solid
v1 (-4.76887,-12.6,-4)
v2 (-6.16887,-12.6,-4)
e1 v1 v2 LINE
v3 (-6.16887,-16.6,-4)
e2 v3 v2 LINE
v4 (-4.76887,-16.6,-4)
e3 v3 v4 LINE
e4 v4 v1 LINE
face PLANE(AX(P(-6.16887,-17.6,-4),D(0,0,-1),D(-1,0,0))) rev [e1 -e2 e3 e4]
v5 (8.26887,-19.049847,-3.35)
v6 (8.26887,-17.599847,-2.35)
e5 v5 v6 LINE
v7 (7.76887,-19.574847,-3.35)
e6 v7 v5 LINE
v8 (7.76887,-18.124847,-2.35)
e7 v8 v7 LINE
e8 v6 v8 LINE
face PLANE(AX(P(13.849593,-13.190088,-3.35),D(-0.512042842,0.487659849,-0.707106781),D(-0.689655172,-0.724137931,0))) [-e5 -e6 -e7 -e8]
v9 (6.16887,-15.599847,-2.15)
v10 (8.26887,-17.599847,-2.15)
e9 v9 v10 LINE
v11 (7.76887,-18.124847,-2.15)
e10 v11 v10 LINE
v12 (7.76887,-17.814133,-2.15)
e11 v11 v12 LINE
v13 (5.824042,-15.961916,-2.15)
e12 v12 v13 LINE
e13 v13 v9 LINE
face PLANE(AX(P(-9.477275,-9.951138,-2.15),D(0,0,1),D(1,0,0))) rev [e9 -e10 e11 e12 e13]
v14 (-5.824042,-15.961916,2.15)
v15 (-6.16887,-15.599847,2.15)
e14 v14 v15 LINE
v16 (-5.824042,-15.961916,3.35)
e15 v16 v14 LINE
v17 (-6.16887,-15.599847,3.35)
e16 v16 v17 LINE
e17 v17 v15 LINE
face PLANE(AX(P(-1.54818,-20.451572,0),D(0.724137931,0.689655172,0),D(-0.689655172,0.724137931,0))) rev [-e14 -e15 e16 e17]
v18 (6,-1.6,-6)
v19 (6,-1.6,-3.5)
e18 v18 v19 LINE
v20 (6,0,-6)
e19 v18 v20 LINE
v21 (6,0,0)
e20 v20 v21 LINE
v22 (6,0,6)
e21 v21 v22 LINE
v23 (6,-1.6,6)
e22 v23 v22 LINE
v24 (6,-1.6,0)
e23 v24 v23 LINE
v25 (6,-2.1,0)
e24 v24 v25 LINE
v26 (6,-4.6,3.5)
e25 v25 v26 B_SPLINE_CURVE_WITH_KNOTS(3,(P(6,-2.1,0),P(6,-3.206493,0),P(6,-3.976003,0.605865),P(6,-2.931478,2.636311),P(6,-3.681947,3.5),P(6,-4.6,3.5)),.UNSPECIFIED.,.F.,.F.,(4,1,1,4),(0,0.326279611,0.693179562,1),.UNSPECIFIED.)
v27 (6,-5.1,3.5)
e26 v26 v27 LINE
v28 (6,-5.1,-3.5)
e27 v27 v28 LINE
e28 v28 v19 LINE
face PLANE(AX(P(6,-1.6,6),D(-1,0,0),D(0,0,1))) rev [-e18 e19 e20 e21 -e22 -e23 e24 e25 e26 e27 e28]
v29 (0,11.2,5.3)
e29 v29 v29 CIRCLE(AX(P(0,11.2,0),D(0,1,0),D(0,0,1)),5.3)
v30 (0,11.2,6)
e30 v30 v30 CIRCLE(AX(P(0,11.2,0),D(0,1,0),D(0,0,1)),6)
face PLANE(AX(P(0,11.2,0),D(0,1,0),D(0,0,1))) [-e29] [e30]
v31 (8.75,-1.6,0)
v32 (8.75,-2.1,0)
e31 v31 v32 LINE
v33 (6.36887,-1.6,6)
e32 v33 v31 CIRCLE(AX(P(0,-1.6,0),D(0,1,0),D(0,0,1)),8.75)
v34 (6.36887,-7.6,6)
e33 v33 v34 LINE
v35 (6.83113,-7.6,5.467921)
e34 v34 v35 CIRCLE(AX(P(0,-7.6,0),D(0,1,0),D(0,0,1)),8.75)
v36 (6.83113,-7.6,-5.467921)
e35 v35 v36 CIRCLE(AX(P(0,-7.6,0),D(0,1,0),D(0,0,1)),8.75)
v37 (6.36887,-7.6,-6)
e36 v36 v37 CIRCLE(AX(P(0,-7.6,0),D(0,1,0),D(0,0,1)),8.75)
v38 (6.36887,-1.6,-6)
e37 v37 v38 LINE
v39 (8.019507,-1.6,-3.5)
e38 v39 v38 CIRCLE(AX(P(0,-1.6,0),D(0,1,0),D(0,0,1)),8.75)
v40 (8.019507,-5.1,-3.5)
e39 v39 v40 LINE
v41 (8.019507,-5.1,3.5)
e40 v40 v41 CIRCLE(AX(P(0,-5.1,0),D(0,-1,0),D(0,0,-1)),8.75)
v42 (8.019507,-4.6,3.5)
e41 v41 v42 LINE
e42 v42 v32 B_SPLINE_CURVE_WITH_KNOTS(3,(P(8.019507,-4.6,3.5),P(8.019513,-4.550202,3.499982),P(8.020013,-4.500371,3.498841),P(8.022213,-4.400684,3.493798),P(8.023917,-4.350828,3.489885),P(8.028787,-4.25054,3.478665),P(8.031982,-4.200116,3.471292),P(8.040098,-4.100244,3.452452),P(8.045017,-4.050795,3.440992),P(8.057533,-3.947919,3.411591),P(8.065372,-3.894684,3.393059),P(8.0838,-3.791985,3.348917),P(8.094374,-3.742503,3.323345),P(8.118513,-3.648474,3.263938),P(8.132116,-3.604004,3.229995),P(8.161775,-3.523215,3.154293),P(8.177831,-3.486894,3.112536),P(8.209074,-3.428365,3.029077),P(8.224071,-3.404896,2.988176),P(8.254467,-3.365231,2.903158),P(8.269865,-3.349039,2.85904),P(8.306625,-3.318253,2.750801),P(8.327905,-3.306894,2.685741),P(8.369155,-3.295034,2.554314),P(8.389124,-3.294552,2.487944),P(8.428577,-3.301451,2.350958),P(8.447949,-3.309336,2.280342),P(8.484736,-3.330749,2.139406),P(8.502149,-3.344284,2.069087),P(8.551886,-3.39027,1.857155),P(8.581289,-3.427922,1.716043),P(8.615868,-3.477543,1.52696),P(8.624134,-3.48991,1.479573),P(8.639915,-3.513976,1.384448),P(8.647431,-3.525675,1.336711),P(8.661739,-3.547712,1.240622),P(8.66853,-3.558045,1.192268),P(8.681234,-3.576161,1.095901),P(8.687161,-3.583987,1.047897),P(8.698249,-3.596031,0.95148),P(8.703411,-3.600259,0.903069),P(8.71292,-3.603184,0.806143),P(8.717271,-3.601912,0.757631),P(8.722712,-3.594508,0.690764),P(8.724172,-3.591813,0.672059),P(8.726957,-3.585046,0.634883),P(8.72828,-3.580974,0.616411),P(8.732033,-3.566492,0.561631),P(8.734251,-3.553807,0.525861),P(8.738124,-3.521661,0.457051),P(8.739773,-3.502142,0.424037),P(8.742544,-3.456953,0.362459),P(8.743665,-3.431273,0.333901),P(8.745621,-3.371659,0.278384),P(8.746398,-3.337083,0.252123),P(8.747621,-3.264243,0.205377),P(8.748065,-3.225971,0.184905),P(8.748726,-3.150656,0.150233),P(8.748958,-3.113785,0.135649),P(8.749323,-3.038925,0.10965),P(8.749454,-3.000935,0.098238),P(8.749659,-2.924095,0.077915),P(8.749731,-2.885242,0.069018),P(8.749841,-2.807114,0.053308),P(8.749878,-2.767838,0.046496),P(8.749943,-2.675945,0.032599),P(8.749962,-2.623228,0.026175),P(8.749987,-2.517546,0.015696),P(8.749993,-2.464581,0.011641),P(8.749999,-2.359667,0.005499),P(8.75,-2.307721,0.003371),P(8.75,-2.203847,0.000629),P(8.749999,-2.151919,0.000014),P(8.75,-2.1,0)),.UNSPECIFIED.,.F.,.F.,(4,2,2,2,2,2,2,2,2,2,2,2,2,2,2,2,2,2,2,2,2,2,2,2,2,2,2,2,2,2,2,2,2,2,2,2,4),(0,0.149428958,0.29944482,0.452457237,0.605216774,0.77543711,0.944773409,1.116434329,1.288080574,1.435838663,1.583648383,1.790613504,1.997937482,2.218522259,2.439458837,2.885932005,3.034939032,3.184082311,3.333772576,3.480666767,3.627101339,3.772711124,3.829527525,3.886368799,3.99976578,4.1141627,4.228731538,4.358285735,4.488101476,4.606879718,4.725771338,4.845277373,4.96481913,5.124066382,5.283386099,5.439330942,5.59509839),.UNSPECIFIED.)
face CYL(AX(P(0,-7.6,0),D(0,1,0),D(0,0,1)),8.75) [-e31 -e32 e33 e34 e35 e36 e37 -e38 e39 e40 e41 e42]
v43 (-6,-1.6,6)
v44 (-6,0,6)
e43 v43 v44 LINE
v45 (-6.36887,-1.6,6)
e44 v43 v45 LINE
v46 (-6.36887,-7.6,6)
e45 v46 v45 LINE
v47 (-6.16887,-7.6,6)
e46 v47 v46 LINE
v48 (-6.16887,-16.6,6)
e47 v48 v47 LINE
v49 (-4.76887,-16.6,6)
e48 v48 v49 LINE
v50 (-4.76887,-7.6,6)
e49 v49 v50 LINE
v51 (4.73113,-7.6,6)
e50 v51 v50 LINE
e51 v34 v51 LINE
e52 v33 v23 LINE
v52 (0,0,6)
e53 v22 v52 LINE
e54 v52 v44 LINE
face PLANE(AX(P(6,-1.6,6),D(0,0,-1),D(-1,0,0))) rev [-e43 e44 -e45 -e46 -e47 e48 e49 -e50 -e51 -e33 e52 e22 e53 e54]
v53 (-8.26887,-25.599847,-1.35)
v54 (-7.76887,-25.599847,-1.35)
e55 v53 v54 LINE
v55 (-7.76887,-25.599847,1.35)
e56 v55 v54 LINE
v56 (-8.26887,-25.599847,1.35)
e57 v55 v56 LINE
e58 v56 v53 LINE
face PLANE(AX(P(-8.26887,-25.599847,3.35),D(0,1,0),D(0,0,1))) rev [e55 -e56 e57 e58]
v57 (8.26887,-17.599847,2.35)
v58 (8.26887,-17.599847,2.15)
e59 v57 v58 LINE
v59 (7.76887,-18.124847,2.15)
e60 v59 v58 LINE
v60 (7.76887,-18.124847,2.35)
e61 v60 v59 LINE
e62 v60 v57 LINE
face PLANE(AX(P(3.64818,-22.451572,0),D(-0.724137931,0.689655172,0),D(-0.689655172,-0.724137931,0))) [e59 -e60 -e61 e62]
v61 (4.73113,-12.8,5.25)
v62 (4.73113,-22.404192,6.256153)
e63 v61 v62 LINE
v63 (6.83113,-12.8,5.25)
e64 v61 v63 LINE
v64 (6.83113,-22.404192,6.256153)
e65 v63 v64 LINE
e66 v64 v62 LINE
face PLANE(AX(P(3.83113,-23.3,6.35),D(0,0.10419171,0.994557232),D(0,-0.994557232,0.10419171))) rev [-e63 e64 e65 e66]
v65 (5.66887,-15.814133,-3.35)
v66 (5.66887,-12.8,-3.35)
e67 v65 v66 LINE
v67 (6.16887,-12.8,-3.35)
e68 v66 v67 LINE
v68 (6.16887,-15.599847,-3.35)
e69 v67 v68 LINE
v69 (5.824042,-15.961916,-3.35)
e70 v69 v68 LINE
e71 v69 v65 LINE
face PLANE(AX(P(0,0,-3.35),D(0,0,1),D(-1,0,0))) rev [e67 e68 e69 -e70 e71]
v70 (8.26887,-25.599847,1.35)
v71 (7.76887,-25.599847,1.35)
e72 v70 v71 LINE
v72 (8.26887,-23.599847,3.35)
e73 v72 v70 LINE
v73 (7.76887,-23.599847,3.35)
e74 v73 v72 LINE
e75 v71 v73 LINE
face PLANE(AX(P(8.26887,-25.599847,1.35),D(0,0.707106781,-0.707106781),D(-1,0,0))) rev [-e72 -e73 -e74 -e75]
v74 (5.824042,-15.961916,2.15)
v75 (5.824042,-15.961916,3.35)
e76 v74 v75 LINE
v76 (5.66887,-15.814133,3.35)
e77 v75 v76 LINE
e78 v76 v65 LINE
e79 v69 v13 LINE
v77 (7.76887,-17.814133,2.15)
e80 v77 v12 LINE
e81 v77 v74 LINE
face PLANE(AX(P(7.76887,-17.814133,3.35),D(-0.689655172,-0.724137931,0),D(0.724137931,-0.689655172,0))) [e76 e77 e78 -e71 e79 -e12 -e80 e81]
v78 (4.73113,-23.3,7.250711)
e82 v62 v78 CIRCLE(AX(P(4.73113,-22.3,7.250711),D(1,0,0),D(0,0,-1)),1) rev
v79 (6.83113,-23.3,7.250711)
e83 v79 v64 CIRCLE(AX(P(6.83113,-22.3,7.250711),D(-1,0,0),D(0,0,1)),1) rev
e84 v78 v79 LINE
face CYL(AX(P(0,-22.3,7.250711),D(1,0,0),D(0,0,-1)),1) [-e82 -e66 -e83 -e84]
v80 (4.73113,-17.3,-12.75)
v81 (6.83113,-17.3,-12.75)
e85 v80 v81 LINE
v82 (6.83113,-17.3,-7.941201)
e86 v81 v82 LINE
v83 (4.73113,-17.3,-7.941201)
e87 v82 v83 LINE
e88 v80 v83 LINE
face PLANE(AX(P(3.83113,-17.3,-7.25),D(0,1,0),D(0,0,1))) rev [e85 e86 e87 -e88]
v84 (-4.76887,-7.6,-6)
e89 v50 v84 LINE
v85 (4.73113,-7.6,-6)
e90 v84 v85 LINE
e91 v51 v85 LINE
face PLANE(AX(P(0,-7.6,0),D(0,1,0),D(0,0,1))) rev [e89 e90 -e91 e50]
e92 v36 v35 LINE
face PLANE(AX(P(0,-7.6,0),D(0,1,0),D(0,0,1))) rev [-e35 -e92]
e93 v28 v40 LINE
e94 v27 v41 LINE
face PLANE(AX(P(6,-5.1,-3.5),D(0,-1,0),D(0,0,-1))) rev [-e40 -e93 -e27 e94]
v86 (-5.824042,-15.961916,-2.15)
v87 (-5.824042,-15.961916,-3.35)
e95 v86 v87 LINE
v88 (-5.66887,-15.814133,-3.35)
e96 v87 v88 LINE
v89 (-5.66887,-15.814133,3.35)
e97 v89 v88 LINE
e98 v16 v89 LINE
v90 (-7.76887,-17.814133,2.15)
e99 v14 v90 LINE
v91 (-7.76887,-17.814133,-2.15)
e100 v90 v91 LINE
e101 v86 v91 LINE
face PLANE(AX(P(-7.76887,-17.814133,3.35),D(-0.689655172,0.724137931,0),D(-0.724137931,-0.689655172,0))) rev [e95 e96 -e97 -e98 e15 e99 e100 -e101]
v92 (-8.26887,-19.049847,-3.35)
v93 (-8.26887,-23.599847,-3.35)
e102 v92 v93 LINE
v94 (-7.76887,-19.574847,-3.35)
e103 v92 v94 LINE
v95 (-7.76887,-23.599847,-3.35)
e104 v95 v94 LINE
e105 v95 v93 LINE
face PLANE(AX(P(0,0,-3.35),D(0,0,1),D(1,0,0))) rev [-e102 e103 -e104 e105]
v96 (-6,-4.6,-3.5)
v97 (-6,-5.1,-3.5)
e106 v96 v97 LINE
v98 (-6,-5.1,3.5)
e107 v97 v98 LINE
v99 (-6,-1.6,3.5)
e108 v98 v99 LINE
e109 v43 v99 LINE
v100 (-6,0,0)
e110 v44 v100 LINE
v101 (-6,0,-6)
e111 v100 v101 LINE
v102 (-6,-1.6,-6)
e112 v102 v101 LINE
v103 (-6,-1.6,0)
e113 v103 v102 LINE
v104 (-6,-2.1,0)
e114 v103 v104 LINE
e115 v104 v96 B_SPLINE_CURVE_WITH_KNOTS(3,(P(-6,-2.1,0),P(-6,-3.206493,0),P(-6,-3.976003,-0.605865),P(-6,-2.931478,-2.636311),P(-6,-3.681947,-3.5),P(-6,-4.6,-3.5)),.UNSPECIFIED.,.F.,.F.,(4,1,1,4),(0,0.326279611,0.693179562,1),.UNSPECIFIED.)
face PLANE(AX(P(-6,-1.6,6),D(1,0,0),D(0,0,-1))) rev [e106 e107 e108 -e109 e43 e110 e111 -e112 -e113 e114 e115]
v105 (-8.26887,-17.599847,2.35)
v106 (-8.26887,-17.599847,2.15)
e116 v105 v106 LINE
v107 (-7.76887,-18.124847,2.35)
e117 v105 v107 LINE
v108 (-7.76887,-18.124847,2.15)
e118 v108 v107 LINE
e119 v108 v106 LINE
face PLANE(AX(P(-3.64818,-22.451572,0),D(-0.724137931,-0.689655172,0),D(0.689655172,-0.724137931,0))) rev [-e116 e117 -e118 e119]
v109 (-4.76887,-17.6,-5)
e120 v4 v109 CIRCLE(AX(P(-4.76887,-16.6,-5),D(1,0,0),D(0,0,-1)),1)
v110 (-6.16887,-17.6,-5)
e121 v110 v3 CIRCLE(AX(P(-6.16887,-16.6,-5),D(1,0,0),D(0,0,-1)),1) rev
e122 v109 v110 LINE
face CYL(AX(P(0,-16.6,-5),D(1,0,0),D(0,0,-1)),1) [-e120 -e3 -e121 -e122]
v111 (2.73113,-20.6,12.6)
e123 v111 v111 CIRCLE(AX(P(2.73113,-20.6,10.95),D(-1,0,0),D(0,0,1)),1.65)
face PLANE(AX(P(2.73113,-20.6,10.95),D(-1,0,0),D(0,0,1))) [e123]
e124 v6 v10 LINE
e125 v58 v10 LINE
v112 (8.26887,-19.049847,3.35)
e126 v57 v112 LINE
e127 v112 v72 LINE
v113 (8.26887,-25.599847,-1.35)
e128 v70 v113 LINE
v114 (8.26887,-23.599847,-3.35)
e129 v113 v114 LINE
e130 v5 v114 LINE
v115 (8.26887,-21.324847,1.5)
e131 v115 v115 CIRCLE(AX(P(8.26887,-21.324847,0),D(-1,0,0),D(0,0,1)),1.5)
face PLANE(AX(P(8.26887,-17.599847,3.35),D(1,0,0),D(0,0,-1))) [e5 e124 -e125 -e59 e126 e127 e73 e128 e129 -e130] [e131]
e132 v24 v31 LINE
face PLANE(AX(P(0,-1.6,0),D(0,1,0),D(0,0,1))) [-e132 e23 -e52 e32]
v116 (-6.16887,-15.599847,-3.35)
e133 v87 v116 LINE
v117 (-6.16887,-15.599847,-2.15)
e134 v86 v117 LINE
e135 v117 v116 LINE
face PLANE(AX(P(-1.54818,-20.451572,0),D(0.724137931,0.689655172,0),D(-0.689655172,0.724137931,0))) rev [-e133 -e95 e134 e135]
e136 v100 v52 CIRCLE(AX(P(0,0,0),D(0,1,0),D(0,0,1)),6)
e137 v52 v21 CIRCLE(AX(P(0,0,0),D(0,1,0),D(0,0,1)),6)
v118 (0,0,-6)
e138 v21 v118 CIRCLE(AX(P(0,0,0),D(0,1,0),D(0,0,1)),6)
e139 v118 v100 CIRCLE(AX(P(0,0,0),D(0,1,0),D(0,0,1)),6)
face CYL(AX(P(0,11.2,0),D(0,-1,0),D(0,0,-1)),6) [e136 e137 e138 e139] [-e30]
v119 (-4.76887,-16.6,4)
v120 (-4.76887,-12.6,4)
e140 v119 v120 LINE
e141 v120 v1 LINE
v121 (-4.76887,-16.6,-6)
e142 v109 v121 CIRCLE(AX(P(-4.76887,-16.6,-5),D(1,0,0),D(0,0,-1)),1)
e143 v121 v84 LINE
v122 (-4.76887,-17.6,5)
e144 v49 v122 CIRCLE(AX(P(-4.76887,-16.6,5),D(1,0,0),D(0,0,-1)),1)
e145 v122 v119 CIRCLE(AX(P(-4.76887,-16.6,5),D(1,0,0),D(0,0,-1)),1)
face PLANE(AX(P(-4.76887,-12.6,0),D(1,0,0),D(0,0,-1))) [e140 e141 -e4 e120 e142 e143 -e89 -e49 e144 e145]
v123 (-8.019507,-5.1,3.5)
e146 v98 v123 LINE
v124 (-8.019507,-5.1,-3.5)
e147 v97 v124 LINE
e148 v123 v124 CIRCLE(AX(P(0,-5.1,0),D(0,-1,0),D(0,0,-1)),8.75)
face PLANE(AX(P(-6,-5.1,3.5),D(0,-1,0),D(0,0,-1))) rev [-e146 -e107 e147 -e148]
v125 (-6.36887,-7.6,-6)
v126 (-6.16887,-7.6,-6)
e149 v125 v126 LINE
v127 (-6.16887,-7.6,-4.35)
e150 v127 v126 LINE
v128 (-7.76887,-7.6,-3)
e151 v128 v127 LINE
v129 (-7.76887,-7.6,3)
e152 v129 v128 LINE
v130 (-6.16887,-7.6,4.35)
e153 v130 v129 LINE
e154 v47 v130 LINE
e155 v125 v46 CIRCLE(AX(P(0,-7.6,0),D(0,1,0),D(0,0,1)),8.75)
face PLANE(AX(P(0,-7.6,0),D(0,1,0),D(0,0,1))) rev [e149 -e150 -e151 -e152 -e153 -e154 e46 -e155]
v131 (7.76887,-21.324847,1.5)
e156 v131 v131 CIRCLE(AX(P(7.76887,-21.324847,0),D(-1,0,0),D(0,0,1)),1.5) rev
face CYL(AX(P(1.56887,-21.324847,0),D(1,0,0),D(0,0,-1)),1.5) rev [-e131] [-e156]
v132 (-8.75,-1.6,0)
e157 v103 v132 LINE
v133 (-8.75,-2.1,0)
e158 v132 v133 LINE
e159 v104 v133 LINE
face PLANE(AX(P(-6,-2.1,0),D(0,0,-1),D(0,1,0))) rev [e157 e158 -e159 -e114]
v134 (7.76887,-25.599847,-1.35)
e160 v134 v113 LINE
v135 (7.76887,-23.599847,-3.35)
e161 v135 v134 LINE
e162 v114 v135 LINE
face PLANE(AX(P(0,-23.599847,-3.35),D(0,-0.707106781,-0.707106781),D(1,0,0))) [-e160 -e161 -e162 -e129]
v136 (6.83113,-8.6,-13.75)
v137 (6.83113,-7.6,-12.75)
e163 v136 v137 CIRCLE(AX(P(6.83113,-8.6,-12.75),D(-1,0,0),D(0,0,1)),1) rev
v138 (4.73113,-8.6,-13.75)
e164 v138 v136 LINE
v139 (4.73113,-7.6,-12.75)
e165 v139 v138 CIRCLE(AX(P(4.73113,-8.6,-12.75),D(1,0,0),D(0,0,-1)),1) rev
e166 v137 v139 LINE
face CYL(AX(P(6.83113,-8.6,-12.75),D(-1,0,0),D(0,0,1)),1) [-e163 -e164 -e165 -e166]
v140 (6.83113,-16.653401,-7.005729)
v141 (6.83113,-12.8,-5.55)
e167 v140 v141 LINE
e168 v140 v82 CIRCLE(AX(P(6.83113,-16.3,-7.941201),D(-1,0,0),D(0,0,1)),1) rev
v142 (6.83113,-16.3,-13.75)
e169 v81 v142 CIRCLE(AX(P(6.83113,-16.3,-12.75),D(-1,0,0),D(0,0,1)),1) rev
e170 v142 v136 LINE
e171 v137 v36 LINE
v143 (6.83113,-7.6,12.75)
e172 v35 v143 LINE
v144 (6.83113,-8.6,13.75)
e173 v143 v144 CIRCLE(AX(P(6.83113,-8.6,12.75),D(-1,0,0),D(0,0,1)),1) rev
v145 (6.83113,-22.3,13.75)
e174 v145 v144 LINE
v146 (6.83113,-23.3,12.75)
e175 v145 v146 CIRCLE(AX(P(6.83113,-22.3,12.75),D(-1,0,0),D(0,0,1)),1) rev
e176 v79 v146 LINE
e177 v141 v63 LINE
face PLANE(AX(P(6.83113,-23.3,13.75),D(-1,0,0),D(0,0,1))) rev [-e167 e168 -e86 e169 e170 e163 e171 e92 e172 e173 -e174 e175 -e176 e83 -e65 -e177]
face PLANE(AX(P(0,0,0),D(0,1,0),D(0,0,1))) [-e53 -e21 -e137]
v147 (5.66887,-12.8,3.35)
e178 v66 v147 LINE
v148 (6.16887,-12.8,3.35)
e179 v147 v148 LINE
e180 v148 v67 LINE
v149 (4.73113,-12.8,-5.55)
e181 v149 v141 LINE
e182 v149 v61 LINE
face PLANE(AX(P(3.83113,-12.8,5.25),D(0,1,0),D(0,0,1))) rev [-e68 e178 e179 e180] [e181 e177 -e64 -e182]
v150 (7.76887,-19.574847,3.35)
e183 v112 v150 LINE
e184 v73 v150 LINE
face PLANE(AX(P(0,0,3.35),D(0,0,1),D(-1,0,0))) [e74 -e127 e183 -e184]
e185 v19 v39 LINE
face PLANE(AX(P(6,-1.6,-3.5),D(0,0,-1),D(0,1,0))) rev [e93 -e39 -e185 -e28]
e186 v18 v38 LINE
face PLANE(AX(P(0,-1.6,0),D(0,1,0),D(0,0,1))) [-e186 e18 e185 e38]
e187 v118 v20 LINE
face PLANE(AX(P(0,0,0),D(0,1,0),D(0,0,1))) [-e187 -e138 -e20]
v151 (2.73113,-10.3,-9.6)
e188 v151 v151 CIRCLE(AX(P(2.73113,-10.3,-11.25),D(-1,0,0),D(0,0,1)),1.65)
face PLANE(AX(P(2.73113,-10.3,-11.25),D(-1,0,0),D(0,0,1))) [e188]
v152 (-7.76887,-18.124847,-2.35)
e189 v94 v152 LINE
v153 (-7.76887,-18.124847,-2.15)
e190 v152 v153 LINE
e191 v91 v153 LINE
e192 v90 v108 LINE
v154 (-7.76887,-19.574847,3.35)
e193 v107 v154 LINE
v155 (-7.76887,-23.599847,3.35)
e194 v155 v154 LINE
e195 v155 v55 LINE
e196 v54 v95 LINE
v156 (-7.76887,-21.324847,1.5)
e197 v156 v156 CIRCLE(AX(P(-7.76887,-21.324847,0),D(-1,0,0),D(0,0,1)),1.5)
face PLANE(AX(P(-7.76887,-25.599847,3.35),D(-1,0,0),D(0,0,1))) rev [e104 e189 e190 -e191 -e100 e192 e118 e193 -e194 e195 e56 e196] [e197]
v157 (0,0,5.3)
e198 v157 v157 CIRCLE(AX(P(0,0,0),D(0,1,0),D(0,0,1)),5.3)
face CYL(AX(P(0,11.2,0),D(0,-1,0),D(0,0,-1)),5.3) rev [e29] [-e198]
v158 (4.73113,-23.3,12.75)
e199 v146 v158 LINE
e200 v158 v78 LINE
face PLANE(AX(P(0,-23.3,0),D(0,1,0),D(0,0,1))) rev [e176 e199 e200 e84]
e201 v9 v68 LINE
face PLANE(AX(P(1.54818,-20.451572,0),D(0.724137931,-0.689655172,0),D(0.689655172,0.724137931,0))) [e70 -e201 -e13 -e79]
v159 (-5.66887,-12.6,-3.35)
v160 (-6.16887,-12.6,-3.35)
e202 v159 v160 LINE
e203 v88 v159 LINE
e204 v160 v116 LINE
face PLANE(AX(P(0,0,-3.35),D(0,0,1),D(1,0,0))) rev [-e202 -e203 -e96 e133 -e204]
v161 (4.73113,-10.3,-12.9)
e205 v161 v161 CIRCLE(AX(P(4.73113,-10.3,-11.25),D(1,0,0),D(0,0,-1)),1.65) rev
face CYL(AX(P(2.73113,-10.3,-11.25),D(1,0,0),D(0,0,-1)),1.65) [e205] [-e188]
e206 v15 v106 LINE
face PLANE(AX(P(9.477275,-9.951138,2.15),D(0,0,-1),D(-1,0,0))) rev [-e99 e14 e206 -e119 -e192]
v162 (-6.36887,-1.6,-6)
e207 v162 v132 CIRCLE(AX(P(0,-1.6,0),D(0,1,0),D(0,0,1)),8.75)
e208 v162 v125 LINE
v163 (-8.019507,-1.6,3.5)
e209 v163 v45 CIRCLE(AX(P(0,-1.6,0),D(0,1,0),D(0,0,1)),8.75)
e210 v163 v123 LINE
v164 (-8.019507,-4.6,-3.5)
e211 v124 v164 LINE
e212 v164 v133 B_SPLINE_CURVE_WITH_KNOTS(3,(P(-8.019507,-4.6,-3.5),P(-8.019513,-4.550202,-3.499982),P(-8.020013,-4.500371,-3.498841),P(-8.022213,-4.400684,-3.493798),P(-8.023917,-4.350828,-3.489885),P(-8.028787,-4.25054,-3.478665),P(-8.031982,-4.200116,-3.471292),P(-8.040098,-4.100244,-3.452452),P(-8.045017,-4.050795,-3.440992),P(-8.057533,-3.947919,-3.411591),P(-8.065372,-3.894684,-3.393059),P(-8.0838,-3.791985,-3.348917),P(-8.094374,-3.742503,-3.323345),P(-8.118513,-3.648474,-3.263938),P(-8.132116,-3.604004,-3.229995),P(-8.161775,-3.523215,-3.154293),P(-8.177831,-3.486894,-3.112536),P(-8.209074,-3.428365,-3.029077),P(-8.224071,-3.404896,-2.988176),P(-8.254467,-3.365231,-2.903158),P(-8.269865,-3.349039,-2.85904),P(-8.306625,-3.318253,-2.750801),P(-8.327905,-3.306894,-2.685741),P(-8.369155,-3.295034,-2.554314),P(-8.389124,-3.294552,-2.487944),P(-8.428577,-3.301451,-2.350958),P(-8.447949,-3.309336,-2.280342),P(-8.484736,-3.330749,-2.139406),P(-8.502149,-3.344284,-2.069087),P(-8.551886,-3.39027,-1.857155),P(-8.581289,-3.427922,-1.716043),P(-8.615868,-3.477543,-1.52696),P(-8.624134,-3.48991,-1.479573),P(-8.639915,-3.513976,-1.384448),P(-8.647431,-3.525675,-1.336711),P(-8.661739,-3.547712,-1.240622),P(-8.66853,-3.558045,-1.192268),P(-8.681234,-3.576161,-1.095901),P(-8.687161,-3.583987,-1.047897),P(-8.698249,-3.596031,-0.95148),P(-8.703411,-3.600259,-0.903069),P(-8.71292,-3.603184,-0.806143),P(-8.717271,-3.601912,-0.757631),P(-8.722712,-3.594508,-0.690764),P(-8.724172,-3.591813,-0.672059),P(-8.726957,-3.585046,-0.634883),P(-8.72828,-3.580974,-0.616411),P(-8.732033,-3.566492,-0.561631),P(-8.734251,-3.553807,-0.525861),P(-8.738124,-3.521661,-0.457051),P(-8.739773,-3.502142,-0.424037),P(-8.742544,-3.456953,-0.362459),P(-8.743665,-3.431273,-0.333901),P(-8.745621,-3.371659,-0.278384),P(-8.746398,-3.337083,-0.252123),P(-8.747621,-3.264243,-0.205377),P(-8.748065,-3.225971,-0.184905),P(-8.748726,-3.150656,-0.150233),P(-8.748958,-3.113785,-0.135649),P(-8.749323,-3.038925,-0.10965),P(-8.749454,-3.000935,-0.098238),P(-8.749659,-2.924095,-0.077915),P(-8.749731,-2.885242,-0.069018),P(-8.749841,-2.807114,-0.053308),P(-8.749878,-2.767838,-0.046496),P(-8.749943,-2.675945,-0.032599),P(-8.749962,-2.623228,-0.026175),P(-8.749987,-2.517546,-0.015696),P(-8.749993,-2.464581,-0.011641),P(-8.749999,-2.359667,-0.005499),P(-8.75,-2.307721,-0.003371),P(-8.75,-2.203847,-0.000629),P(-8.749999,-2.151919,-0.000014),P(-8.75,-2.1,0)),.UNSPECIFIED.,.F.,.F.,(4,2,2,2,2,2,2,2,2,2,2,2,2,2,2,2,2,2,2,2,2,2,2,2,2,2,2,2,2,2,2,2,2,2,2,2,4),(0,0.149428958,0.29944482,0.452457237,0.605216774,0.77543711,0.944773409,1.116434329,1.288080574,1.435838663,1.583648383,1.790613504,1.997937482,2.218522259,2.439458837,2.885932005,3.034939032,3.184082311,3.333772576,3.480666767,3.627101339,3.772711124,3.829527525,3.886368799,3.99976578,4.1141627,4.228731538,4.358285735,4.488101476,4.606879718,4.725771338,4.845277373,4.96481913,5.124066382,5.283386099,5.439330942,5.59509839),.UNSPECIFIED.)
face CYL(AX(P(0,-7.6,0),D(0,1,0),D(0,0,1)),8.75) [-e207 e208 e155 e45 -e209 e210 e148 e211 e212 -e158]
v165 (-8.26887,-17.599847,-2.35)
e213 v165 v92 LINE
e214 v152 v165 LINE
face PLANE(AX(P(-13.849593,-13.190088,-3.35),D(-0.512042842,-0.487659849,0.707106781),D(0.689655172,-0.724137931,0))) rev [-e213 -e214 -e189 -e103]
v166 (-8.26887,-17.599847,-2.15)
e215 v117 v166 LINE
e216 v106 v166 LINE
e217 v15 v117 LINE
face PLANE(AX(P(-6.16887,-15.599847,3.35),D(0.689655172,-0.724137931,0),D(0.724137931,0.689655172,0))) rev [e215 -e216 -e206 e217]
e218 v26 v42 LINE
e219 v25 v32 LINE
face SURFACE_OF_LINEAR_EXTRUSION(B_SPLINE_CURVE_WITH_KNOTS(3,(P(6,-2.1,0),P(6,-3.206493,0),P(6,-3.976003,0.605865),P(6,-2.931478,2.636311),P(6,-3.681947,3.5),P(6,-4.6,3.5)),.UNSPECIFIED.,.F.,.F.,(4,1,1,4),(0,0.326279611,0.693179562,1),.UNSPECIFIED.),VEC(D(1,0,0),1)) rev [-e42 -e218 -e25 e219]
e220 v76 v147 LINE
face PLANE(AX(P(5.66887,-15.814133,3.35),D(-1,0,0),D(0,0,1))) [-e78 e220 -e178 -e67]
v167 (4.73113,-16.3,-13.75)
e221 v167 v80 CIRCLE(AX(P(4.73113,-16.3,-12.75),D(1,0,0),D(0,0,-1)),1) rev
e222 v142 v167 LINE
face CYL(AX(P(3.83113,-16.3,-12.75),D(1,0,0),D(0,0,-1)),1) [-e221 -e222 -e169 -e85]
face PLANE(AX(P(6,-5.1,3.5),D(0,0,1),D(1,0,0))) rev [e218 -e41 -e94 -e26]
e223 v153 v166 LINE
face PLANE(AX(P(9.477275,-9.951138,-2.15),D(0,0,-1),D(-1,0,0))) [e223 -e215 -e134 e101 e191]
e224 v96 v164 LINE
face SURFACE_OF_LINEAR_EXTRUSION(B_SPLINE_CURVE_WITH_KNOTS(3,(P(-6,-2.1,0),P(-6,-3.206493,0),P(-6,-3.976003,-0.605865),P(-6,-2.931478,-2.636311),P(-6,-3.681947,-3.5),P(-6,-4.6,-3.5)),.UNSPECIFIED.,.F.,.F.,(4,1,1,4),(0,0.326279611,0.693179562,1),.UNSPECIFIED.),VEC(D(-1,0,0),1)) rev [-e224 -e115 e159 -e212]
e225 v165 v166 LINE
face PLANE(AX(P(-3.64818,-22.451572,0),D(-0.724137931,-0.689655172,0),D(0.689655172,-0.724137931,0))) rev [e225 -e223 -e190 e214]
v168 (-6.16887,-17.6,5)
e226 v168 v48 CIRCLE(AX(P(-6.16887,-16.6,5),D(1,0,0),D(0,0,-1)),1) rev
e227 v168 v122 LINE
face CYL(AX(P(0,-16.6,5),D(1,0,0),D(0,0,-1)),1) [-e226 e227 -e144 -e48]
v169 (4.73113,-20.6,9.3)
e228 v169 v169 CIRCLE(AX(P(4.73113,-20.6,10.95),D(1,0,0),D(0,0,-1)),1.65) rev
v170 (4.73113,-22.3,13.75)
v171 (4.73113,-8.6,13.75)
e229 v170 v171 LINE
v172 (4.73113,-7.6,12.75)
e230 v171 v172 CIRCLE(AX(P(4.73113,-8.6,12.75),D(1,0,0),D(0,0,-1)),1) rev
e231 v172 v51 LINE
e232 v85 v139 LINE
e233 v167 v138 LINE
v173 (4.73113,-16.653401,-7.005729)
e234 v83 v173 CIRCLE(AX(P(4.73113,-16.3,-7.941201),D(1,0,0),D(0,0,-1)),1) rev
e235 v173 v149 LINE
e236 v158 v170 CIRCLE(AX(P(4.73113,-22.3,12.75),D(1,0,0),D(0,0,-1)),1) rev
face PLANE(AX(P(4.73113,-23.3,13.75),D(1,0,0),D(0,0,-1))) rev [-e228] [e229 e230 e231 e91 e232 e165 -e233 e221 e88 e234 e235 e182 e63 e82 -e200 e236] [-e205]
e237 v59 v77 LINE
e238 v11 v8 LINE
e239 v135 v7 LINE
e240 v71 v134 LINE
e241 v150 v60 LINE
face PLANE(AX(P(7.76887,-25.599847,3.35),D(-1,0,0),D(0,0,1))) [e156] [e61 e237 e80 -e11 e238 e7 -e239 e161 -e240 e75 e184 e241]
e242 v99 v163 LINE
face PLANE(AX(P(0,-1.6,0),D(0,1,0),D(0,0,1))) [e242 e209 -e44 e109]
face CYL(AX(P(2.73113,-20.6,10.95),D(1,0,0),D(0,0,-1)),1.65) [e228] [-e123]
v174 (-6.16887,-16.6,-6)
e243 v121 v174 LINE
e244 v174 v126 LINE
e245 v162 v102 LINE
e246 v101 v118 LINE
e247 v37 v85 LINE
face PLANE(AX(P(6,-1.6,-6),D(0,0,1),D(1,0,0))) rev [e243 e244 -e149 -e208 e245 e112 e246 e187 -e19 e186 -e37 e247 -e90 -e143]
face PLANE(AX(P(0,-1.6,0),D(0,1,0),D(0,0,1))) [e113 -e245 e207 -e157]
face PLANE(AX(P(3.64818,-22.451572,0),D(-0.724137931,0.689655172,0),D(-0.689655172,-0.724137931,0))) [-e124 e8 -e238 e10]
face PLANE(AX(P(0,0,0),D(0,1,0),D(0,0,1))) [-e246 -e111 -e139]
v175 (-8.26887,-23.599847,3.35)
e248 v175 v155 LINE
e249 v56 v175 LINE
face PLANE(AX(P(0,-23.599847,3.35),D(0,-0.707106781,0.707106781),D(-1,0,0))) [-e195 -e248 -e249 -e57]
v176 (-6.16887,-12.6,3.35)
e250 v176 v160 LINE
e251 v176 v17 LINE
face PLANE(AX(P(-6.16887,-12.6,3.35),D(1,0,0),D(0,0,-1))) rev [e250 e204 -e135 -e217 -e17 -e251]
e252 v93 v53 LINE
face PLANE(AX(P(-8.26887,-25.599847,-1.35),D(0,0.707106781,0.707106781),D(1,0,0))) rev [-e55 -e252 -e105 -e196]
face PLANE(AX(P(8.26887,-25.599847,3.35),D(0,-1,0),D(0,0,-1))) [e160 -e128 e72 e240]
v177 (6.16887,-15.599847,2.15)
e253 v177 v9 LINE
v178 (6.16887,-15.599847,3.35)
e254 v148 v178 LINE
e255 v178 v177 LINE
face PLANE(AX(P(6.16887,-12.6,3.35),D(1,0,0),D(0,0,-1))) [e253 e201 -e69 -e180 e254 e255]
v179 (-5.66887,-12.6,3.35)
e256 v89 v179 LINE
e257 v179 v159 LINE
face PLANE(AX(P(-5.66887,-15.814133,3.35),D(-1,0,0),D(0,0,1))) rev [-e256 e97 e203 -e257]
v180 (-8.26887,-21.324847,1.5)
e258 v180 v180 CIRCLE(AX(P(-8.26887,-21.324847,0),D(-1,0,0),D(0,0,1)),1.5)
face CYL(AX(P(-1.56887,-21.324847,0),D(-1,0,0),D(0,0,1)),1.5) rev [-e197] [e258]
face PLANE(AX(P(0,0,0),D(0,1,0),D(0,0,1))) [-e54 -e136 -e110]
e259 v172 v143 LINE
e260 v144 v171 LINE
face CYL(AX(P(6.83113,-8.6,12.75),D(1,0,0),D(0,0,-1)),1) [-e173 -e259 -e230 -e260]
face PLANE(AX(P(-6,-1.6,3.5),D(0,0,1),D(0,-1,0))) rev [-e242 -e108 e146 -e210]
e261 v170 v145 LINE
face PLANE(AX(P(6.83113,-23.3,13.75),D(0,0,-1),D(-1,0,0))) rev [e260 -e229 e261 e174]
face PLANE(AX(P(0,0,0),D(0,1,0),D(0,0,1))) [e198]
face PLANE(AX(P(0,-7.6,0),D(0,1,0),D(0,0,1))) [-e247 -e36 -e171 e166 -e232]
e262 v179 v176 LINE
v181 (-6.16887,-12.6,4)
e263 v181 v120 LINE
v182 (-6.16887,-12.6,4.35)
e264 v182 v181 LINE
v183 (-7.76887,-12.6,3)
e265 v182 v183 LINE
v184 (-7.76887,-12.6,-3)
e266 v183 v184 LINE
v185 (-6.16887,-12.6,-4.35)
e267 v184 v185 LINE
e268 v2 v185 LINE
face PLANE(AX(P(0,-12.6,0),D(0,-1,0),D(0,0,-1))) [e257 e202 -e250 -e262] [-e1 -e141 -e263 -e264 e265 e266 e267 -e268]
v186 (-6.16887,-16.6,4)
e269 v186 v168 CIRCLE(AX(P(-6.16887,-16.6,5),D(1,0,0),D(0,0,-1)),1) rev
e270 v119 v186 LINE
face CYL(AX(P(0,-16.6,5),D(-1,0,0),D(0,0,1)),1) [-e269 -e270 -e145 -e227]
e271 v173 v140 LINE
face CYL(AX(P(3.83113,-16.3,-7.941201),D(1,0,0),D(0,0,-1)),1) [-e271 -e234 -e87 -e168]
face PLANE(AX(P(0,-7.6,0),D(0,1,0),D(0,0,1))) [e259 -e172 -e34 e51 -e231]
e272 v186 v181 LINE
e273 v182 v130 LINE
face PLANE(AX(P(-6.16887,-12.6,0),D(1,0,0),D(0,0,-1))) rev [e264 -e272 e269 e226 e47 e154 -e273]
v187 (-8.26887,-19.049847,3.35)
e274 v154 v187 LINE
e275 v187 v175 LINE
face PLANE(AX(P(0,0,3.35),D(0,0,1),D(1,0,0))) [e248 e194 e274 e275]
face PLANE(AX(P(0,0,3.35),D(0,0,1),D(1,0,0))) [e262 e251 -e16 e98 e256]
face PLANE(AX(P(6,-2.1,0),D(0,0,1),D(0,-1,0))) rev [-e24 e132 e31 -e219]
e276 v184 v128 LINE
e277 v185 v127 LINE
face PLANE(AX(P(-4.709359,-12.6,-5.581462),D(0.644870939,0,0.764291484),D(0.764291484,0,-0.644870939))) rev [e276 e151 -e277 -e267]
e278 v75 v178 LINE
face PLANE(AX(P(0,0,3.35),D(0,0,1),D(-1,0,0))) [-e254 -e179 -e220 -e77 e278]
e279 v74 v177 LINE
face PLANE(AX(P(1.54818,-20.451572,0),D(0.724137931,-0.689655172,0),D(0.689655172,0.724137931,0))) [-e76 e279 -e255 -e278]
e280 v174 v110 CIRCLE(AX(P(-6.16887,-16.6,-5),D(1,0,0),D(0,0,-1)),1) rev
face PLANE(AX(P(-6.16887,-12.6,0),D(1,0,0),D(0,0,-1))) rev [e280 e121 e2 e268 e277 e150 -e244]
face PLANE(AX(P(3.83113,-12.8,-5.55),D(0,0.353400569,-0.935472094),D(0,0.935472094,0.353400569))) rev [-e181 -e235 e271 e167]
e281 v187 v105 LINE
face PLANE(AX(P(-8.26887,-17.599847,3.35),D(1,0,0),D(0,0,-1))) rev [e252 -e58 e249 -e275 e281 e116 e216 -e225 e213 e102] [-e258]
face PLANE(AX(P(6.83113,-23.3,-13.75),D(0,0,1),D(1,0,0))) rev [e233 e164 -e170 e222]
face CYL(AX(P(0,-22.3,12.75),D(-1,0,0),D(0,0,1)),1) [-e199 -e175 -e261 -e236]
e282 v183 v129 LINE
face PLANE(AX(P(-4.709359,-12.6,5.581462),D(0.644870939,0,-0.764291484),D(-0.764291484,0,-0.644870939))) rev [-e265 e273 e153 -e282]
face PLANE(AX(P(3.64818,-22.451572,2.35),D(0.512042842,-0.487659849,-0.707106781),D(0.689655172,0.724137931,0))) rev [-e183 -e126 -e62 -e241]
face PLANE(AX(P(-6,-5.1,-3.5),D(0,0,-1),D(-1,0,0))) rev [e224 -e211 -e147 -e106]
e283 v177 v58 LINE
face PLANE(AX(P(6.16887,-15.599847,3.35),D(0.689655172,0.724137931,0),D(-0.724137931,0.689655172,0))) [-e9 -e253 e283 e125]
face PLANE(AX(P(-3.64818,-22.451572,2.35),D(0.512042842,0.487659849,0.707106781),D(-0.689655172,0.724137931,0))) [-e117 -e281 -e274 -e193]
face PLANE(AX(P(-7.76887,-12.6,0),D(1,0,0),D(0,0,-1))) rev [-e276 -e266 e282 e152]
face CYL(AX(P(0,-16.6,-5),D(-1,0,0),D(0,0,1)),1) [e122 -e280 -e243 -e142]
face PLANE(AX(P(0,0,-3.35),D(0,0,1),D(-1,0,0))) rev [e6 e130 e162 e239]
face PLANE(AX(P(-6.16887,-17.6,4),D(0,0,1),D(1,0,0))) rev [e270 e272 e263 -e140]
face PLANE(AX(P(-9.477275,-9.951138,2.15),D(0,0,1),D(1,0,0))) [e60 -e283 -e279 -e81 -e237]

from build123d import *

# Parameters (mm, degrees)
SKETCH1_R                = 6
SKETCH1_R_2              = 5.3
BOSS_EXTRUDE1_DEPTH      = 11.2
SKETCH2_W                = 12
SKETCH2_H                = 12
BOSS_EXTRUDE2_DEPTH      = 1.6
SKETCH3_W                = 17.5
SKETCH3_H                = 12
BOSS_EXTRUDE3_DEPTH      = 6
CUT_EXTRUDE1_DEPTH       = 2.75
CIRPATTERN8_COUNT        = 2
SKETCH5_OUTSIDE_W        = 25.17
SKETCH5_OUTSIDE_H        = 19.67
SKETCH5_OUTSIDE_R        = 8.75
CUT_EXTRUDE2_DEPTH       = 22.587091205
BOSS_EXTRUDE4_DEPTH      = 5
SKETCH7_W                = 1.4
SKETCH7_H                = 2
BOSS_EXTRUDE5_DEPTH      = 5
SKETCH8_W                = 2.1
SKETCH8_H                = 27.5
BOSS_EXTRUDE6_DEPTH      = 15.7
CUT_EXTRUDE3_DEPTH       = 3
FILLET1_R                = 1
BOSS_EXTRUDE7_DEPTH      = 3.35
SKETCH12_W               = 2.9
SKETCH12_H               = 1.2
CUT_EXTRUDE4_DEPTH       = 6.7
CHAMFER1_SIZE            = 1
CHAMFER2_SIZE            = 2
SKETCH13_R               = 1.5
CUT_EXTRUDE5_DEPTH       = 6.7
CHAMFER1_OF_MIRROR3_SIZE = 1
CHAMFER2_OF_MIRROR3_SIZE = 2
SKETCH14_R               = 1.65
BOSS_EXTRUDE8_DEPTH      = 2


# Some blends are built 0.0001 mm under size
with BuildPart() as part:
    # Sketch1 → Boss-Extrude1 (new body)
    with BuildSketch(Plane(origin=(0, 0, 0), x_dir=(1, 0, 0), z_dir=(0, 1, 0))):
        with Locations(Location((0, 0, 0), (0, 0, 270))):
            Circle(SKETCH1_R)
        with Locations(Location((0, 0, 0), (0, 0, 270))):
            Circle(SKETCH1_R_2, mode=Mode.SUBTRACT)
    extrude(amount=BOSS_EXTRUDE1_DEPTH)

    # Sketch2 → Boss-Extrude2 (add)
    with BuildSketch(Plane.XZ):
        Rectangle(SKETCH2_W, SKETCH2_H)
    extrude(amount=BOSS_EXTRUDE2_DEPTH)

    # Sketch3 → Boss-Extrude3 (add)
    with BuildSketch(Plane.XZ.offset(1.6)):
        Rectangle(SKETCH3_W, SKETCH3_H)
    extrude(amount=BOSS_EXTRUDE3_DEPTH)

    # Sketch4 → Cut-Extrude1 (cut)
    with BuildSketch(Plane.ZY.offset(8.75)):
        with BuildLine():
            Line((3.5, -1.6), (3.5, -5.1))
            Line((3.5, -5.1), (-3.5, -5.1))
            Line((-3.5, -5.1), (-3.5, -4.6))
            add(Edge.make_bspline(
                [(-3.5, -4.6), (-3.5, -3.681946605), (-2.636311327, -2.93147779), (-0.605865115, -3.976002744), (0, -3.206492633), (0, -2.1)],
                knots=[0, 0, 0, 0, 0.306820438, 0.673720389, 1, 1, 1, 1], degree=3))
            Line((0, -2.1), (0, -1.6))
            Line((0, -1.6), (3.5, -1.6))
        make_face()
    cut_extrude1 = extrude(amount=-CUT_EXTRUDE1_DEPTH, mode=Mode.SUBTRACT)

    # CirPattern8: Cut-Extrude1 ×2 about axis
    cirpattern8_axis = Axis((0, 11.2, 0), (0, -1, 0))
    for i in range(1, CIRPATTERN8_COUNT):
        add(cut_extrude1.rotate(cirpattern8_axis, i * 360 / CIRPATTERN8_COUNT), mode=Mode.SUBTRACT)

    # Sketch5 outside → Cut-Extrude2 (cut, through all)
    with BuildSketch(Plane(origin=(0, 11.2, 0), x_dir=(1, 0, 0), z_dir=(0, 1, 0))):
        Rectangle(SKETCH5_OUTSIDE_W, SKETCH5_OUTSIDE_H)
        Circle(SKETCH5_OUTSIDE_R, mode=Mode.SUBTRACT)
    extrude(amount=-CUT_EXTRUDE2_DEPTH, mode=Mode.SUBTRACT)

    # Sketch6 → Boss-Extrude4 (add)
    with BuildSketch(Plane.XZ.offset(7.6)):
        Polygon((-6.168869601, -4.35), (-6.168869601, 4.35), (-7.768869601, 3), (-7.768869601, -3), align=None)
        Polygon((-4.768869601, -6), (-4.768869601, 6), (-6.168869601, 6), (-6.168869601, 4.35), (-6.168869601, -4.35), (-6.168869601, -6), align=None)
    extrude(amount=BOSS_EXTRUDE4_DEPTH)

    # Sketch7 → Boss-Extrude5 (add)
    with BuildSketch(Plane.XZ.offset(12.6)):
        with Locations((-5.468869601, 5)):
            Rectangle(SKETCH7_W, SKETCH7_H)
        with Locations((-5.468869601, -5)):
            Rectangle(SKETCH7_W, SKETCH7_H)
    extrude(amount=BOSS_EXTRUDE5_DEPTH)

    # Sketch8 → Boss-Extrude6 (add)
    with BuildSketch(Plane.XZ.offset(7.6)):
        with Locations((5.781130399, 0)):
            Rectangle(SKETCH8_W, SKETCH8_H)
    extrude(amount=BOSS_EXTRUDE6_DEPTH)

    # Sketch9 → Cut-Extrude3 (cut)
    with BuildSketch(Plane(origin=(6.831130399, 0, 0), x_dir=(0, 0, -1), z_dir=(1, 0, 0))):
        Polygon((-6.35, -23.3), (-5.25, -12.8), (5.55, -12.8), (7.25, -17.3), (13.75, -17.3), (13.75, -23.3), align=None)
    extrude(amount=-CUT_EXTRUDE3_DEPTH, mode=Mode.SUBTRACT)

    # Fillet1
    fillet1_edges = [part.edges().sort_by_distance(p)[0] for p in [
        (5.781130399, -7.6, 13.75),
        (5.781130399, -7.6, -13.75),
        (-5.468869601, -17.6, -6),
        (-5.468869601, -17.6, -4),
        (-5.468869601, -17.6, 6),
        (-5.468869601, -17.6, 4),
        (5.781130399, -23.3, 13.75),
        (5.781130399, -23.3, 6.35),
        (5.781130399, -17.3, -7.25),
        (5.781130399, -17.3, -13.75),
    ]]
    fillet(fillet1_edges, radius=FILLET1_R - 0.0001)  # a hair under: the kernel refuses the full size

    # Sketch11 → Boss-Extrude7 (add, symmetric)
    with BuildSketch(Plane.XY):
        Polygon((-6.168869601, -12.6), (-6.168869601, -15.599847371), (-8.268869601, -17.599847371), (-8.268869601, -25.599847371), (-7.768869601, -25.599847371), (-7.768869601, -17.814133086), (-5.668869601, -15.814133086), (-5.668869601, -12.6), align=None)
    boss_extrude7 = extrude(amount=BOSS_EXTRUDE7_DEPTH, both=True)

    # Sketch12 → Cut-Extrude4 (cut)
    with BuildSketch(Plane(origin=(4.856585084, -5.099414338, 0), x_dir=(0.7241379310344822, 0.6896551724137937, 0), z_dir=(-0.6896551724137937, 0.7241379310344822, 0))):
        with Locations((-16.675627899, 2.75)):
            Rectangle(SKETCH12_W, SKETCH12_H)
        with Locations((-16.675627899, -2.75)):
            Rectangle(SKETCH12_W, SKETCH12_H)
    cut_extrude4 = extrude(amount=-CUT_EXTRUDE4_DEPTH, mode=Mode.SUBTRACT)

    # Chamfer1
    # the kernel refuses this chamfer: 1 mm, written as the material it takes off along each edge
    with BuildSketch(Plane(origin=(-10.042444076, -15.737594173, -3.35), x_dir=(0.019910807200768887, 0.018962673524541826, 0.9996219169112968), z_dir=(0.6896551724137937, -0.7241379310344822, 0))) as chamfer1_piece_1:
        Polygon((CHAMFER1_SIZE * 0.999621916911, CHAMFER1_SIZE * 0.0274958766106), (-CHAMFER1_SIZE * 0.0274958766106, CHAMFER1_SIZE * 0.999621916911), (0, 0), align=None)
    extrude(amount=5.868365976, mode=Mode.SUBTRACT)
    with BuildSketch(Plane(origin=(-10.042444076, -15.737594173, 3.35), x_dir=(0.019910807200768887, 0.018962673524541826, -0.9996219169112968), z_dir=(0.6896551724137937, -0.7241379310344822, 0))) as chamfer1_piece_2:
        Polygon((CHAMFER1_SIZE * 0.999621916911, -CHAMFER1_SIZE * 0.0274958766106), (-CHAMFER1_SIZE * 0.0274958766106, -CHAMFER1_SIZE * 0.999621916911), (0, 0), align=None)
    extrude(amount=5.868365976, mode=Mode.SUBTRACT)

    # Chamfer2
    chamfer2_edges = [part.edges().sort_by_distance(p)[0] for p in [
        (-8.018869601, -25.599847371, -3.35),
        (-8.018869601, -25.599847371, 3.35),
    ]]
    chamfer(chamfer2_edges, length=CHAMFER2_SIZE)

    # Sketch13 → Cut-Extrude5 (cut)
    with BuildSketch(Plane.ZY.offset(8.268869601)):
        with Locations((0, -21.324847371)):
            Circle(SKETCH13_R)
    cut_extrude5 = extrude(amount=-CUT_EXTRUDE5_DEPTH, mode=Mode.SUBTRACT)

    # Mirror3: Boss-Extrude7, Cut-Extrude4, Cut-Extrude5 across plane
    add(boss_extrude7.mirror(Plane(origin=(0, 0, 0), x_dir=(0, 0, 1), z_dir=(1, 0, 0))))
    add(cut_extrude4.mirror(Plane(origin=(0, 0, 0), x_dir=(0, 0, 1), z_dir=(1, 0, 0))), mode=Mode.SUBTRACT)
    add(cut_extrude5.mirror(Plane(origin=(0, 0, 0), x_dir=(0, 0, 1), z_dir=(1, 0, 0))), mode=Mode.SUBTRACT)

    # Chamfer1 of Mirror3
    # the kernel refuses this chamfer: 1 mm, written as the material it takes off along each edge
    with BuildSketch(Plane(origin=(10.042444076, -15.737594173, -3.35), x_dir=(0.7238641467288695, -0.6893944254560673, -0.02749587661058651), z_dir=(-0.6896551724137937, -0.7241379310344822, 0))) as chamfer1_of_mirror3_piece_1:
        Polygon((CHAMFER1_OF_MIRROR3_SIZE * 0.999621916911, CHAMFER1_OF_MIRROR3_SIZE * 0.0274958766106), (-CHAMFER1_OF_MIRROR3_SIZE * 0.0274958766106, CHAMFER1_OF_MIRROR3_SIZE * 0.999621916911), (0, 0), align=None)
    extrude(amount=5.868365976, mode=Mode.SUBTRACT)
    with BuildSketch(Plane(origin=(10.042444076, -15.737594173, 3.35), x_dir=(0.7238641467288695, -0.6893944254560673, 0.02749587661058651), z_dir=(-0.6896551724137937, -0.7241379310344822, 0))) as chamfer1_of_mirror3_piece_2:
        Polygon((CHAMFER1_OF_MIRROR3_SIZE * 0.999621916911, -CHAMFER1_OF_MIRROR3_SIZE * 0.0274958766106), (-CHAMFER1_OF_MIRROR3_SIZE * 0.0274958766106, -CHAMFER1_OF_MIRROR3_SIZE * 0.999621916911), (0, 0), align=None)
    extrude(amount=5.868365976, mode=Mode.SUBTRACT)

    # Chamfer2 of Mirror3
    chamfer2_of_mirror3_edges = [part.edges().sort_by_distance(p)[0] for p in [
        (8.018869601, -25.599847371, -3.35),
        (8.018869601, -25.599847371, 3.35),
    ]]
    chamfer(chamfer2_of_mirror3_edges, length=CHAMFER2_OF_MIRROR3_SIZE)

    # Sketch14 → Boss-Extrude8 (add)
    with BuildSketch(Plane.ZY.offset(-4.731130399)):
        with Locations(Location((-11.25, -10.3, 0), (0, 0, 180))):
            Circle(SKETCH14_R)
        with Locations(Location((10.95, -20.6, 0), (0, 0, 180))):
            Circle(SKETCH14_R)
    extrude(amount=BOSS_EXTRUDE8_DEPTH)


solid = part.part
